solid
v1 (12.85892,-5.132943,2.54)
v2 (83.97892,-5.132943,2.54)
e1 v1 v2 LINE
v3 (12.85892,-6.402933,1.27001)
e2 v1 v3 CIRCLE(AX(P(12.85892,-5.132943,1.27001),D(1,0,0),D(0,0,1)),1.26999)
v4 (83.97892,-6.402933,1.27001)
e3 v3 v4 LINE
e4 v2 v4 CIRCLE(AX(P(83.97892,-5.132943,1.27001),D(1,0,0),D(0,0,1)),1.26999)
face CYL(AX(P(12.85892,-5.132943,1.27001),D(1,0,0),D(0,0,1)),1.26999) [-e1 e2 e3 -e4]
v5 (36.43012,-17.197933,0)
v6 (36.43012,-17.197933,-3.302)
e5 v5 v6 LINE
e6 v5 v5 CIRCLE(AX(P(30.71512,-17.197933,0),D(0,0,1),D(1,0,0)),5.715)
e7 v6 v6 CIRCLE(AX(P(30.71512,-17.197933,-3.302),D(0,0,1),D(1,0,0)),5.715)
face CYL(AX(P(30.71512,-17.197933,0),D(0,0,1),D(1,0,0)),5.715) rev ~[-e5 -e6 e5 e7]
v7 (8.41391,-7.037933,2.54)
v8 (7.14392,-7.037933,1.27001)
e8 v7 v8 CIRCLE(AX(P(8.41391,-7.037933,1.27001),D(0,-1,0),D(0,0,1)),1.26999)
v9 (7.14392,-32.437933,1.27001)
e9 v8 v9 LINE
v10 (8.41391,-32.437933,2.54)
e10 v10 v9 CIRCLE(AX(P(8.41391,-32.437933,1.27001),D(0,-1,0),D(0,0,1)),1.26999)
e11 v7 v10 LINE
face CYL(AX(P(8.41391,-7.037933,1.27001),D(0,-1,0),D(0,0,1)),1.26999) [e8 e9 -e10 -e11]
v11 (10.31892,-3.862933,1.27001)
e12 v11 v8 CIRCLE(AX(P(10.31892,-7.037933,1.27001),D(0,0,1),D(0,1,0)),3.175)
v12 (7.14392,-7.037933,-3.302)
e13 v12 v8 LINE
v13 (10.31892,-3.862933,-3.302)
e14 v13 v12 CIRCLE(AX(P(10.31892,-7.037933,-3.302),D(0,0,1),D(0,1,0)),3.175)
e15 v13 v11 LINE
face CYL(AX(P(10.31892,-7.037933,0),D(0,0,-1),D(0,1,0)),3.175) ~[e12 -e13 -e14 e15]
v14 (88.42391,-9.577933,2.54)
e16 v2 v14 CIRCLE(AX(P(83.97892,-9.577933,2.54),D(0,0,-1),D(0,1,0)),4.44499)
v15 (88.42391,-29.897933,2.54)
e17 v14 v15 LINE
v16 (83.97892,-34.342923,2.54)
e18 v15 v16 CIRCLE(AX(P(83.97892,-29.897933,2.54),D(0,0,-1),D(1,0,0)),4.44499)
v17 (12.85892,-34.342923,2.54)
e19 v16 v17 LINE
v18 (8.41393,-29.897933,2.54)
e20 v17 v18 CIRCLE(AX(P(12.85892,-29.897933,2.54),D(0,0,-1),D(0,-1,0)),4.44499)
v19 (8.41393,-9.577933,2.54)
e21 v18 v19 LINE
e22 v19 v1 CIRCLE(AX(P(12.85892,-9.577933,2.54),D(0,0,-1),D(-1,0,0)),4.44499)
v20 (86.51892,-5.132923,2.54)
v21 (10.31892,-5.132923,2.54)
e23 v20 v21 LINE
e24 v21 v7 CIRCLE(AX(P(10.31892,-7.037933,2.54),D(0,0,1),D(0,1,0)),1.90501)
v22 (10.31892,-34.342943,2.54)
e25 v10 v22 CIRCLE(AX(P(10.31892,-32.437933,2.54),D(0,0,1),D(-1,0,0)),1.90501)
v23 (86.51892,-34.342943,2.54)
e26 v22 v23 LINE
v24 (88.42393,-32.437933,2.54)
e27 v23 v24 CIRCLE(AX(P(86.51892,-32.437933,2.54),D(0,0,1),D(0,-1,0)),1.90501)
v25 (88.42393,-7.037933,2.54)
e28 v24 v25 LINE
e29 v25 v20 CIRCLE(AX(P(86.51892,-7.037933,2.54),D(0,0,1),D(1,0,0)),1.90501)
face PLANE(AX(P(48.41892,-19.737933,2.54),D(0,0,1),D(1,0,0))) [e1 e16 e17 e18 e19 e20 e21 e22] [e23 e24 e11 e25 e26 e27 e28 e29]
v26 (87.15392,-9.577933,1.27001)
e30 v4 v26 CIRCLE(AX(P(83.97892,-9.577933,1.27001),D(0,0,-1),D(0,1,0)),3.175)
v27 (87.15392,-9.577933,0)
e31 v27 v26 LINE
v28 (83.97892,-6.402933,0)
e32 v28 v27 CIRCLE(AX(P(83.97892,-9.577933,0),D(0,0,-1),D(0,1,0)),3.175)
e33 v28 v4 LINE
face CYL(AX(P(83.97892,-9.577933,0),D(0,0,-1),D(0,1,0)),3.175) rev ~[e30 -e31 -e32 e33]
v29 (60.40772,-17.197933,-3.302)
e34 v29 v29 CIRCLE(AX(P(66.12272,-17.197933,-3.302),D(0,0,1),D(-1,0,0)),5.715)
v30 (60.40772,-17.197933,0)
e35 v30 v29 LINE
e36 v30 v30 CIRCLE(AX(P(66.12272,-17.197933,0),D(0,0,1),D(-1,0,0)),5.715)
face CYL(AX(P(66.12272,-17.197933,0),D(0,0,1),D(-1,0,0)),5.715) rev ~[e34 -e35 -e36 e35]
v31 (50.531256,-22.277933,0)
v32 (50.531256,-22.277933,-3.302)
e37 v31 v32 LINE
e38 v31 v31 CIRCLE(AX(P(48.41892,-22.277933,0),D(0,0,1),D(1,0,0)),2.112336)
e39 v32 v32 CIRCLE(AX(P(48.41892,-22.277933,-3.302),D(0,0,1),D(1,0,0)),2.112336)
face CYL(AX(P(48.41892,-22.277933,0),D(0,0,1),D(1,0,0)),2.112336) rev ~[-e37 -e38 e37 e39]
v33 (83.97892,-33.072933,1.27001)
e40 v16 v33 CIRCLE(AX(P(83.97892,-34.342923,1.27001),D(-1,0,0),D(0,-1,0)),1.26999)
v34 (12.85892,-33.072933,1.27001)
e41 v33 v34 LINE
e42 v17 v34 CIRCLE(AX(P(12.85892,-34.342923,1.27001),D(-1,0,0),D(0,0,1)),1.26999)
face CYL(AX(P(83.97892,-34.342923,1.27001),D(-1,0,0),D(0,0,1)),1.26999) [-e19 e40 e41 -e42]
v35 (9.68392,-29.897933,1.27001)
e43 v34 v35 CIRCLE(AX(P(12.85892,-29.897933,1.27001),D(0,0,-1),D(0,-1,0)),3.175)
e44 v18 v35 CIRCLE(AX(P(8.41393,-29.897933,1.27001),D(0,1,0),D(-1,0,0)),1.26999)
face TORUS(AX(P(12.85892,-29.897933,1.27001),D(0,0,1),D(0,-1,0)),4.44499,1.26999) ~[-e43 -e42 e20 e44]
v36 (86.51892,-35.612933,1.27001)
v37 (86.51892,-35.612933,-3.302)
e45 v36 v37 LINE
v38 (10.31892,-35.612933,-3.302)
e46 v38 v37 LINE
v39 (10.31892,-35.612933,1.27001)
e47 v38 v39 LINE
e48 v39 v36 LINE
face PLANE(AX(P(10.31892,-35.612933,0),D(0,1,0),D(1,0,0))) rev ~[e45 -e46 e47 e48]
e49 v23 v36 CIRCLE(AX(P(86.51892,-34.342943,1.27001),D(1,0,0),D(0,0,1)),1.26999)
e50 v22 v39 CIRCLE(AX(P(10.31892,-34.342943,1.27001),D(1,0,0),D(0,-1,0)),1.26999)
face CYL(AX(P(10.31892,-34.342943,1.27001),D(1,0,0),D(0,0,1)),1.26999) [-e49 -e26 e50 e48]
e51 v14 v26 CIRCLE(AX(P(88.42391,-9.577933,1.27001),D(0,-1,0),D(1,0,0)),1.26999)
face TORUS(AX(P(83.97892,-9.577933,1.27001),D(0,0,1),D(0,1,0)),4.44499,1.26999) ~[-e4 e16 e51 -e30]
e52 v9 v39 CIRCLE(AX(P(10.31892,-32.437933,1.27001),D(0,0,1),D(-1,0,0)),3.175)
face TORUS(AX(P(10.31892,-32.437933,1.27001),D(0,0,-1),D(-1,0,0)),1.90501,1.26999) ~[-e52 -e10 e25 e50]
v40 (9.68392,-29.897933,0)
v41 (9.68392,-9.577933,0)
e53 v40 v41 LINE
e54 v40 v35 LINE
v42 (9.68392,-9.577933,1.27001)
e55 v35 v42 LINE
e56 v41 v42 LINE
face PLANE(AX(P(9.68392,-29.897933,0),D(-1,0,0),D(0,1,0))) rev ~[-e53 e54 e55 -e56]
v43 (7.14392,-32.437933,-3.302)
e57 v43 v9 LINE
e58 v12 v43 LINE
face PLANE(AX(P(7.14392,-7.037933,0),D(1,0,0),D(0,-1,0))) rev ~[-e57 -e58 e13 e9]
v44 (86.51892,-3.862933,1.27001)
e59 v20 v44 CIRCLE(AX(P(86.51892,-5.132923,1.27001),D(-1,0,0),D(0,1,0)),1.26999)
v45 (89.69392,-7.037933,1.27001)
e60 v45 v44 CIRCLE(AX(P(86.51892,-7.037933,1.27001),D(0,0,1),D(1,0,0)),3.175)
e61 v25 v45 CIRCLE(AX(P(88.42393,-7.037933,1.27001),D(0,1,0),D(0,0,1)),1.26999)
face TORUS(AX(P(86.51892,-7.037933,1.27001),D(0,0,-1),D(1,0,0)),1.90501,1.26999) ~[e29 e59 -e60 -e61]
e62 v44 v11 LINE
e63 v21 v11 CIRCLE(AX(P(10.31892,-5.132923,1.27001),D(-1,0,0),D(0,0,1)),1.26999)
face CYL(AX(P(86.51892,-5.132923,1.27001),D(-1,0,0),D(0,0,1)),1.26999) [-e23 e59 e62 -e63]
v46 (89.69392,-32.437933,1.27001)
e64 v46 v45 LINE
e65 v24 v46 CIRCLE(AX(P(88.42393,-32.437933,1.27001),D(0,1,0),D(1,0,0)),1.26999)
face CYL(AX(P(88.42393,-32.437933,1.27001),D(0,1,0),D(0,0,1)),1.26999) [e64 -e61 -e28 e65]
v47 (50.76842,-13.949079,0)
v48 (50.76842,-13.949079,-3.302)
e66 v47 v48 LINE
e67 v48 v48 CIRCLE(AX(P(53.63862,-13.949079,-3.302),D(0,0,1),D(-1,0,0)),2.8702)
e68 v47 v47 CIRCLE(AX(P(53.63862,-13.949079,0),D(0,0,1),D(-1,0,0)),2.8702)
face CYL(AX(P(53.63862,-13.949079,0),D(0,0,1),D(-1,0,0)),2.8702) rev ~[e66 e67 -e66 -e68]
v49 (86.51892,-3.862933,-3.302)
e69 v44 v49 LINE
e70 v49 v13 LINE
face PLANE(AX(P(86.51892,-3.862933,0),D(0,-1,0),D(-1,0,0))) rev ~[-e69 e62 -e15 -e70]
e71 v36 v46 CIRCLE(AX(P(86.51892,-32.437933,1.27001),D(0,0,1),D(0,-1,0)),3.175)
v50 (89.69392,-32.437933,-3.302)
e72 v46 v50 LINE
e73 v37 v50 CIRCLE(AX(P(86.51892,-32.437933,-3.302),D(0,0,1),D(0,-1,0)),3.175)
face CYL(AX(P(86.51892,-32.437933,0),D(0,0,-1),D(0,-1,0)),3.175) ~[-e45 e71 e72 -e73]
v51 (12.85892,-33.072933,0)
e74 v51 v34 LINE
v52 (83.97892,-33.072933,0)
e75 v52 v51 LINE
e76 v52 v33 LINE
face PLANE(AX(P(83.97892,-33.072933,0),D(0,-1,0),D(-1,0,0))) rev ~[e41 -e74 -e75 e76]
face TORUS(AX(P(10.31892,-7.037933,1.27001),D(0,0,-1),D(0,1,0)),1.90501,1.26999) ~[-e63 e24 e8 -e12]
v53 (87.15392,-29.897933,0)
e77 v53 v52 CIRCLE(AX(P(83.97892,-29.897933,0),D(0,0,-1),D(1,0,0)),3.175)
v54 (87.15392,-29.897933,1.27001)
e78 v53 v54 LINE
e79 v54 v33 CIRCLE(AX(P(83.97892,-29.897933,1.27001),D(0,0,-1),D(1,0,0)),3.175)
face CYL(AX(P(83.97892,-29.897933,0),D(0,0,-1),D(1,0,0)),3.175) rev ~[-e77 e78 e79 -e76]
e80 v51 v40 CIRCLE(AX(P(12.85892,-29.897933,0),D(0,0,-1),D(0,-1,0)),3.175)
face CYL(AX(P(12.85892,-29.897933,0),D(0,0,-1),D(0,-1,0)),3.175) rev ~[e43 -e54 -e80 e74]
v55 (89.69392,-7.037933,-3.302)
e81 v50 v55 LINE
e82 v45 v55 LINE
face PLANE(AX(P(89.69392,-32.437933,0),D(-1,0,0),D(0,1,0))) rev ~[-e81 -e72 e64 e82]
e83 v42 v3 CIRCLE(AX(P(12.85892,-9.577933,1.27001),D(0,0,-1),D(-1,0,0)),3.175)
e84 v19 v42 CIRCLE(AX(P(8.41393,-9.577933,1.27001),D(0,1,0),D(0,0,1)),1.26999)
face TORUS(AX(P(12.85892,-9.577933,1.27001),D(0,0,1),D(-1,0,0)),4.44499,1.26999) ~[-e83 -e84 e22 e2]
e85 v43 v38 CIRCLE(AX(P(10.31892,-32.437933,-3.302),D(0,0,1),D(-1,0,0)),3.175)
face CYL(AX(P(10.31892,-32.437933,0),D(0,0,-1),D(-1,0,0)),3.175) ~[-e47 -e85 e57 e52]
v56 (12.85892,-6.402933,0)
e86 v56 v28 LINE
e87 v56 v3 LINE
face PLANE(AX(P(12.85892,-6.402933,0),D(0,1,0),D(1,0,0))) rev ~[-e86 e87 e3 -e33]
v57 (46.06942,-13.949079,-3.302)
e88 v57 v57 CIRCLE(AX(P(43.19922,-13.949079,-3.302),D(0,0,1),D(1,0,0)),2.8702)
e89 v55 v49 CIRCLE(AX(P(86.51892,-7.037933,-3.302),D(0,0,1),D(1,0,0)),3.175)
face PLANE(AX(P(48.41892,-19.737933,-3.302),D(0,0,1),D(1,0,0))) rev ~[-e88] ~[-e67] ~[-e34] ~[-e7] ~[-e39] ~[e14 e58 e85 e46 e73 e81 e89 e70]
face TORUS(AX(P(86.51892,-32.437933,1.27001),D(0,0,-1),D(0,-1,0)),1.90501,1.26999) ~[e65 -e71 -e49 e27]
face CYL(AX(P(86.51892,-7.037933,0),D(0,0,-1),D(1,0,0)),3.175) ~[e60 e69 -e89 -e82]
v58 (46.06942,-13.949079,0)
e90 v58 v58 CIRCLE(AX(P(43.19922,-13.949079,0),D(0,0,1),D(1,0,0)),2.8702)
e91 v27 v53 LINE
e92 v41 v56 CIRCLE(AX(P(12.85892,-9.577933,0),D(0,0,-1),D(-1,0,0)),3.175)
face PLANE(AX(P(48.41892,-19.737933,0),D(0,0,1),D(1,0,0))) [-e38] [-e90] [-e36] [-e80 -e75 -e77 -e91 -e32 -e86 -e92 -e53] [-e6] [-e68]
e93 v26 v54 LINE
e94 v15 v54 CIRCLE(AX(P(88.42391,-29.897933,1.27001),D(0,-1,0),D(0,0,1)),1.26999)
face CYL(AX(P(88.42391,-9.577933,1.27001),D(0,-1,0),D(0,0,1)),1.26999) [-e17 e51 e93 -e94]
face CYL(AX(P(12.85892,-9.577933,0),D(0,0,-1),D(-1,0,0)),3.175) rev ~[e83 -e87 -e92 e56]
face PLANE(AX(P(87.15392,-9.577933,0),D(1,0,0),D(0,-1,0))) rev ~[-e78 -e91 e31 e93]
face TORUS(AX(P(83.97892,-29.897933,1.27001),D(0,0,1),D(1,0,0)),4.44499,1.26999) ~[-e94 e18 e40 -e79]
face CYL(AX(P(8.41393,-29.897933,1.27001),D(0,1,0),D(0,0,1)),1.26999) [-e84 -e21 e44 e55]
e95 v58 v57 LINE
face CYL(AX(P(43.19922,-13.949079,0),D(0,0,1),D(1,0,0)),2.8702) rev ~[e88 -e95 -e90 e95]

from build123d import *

# Parameters (mm, degrees)
F1_DEPTH = 3.302
F2_DEPTH = 2.54
F3_R     = 5.715
F3_R_2   = 2.8702
F3_R_3   = 2.1123361497
F4_DEPTH = 3.303
F5_R     = 1.26999


# Not quite as in the source:
# - a fillet or chamfer is up to 0.001 mm smaller than in the source, because OpenCascade refuses the exact size


with BuildPart() as f1:
    # F0 (on Top) → F1 (new body)
    with BuildSketch(Plane.XY):
        with BuildLine():
            Line((86.5189202702, -3.8629329861), (10.3189202702, -3.8629329861))
            ThreePointArc((10.3189202702, -3.8629329861), (8.0738562399, -4.7928689558), (7.1439202702, -7.0379329861))
            Line((7.1439202702, -7.0379329861), (7.1439202702, -32.4379329861))
            ThreePointArc((7.1439202702, -32.4379329861), (8.0738562399, -34.6829970164), (10.3189202702, -35.6129329861))
            Line((10.3189202702, -35.6129329861), (86.5189202702, -35.6129329861))
            ThreePointArc((86.5189202702, -35.6129329861), (88.7639843005, -34.6829970164), (89.6939202702, -32.4379329861))
            Line((89.6939202702, -32.4379329861), (89.6939202702, -7.0379329861))
            ThreePointArc((89.6939202702, -7.0379329861), (88.7639843005, -4.7928689558), (86.5189202702, -3.8629329861))
        make_face()
        with BuildLine():
            Line((83.9789202702, -33.0729329861), (12.8589202702, -33.0729329861))
            ThreePointArc((12.8589202702, -33.0729329861), (10.6138562399, -32.1429970164), (9.6839202702, -29.8979329861))
            Line((9.6839202702, -29.8979329861), (9.6839202702, -9.5779329861))
            ThreePointArc((9.6839202702, -9.5779329861), (10.6138562399, -7.3328689558), (12.8589202702, -6.4029329861))
            Line((12.8589202702, -6.4029329861), (83.9789202702, -6.4029329861))
            ThreePointArc((83.9789202702, -6.4029329861), (86.2239843005, -7.3328689558), (87.1539202702, -9.5779329861))
            Line((87.1539202702, -9.5779329861), (87.1539202702, -29.8979329861))
            ThreePointArc((87.1539202702, -29.8979329861), (86.2239843005, -32.1429970164), (83.9789202702, -33.0729329861))
        make_face(mode=Mode.SUBTRACT)
        with BuildLine():
            ThreePointArc((9.6839202702, -29.8979329861), (10.6138562399, -32.1429970164), (12.8589202702, -33.0729329861))
            Line((12.8589202702, -33.0729329861), (83.9789202702, -33.0729329861))
            ThreePointArc((83.9789202702, -33.0729329861), (86.2239843005, -32.1429970164), (87.1539202702, -29.8979329861))
            Line((87.1539202702, -29.8979329861), (87.1539202702, -9.5779329861))
            ThreePointArc((87.1539202702, -9.5779329861), (86.2239843005, -7.3328689558), (83.9789202702, -6.4029329861))
            Line((83.9789202702, -6.4029329861), (12.8589202702, -6.4029329861))
            ThreePointArc((12.8589202702, -6.4029329861), (10.6138562399, -7.3328689558), (9.6839202702, -9.5779329861))
            Line((9.6839202702, -9.5779329861), (9.6839202702, -29.8979329861))
        make_face()
    extrude(amount=-F1_DEPTH)

    # F0 (on Top) → F2 (join)
    with BuildSketch(Plane.XY):
        with BuildLine():
            Line((86.5189202702, -3.8629329861), (10.3189202702, -3.8629329861))
            ThreePointArc((10.3189202702, -3.8629329861), (8.0738562399, -4.7928689558), (7.1439202702, -7.0379329861))
            Line((7.1439202702, -7.0379329861), (7.1439202702, -32.4379329861))
            ThreePointArc((7.1439202702, -32.4379329861), (8.0738562399, -34.6829970164), (10.3189202702, -35.6129329861))
            Line((10.3189202702, -35.6129329861), (86.5189202702, -35.6129329861))
            ThreePointArc((86.5189202702, -35.6129329861), (88.7639843005, -34.6829970164), (89.6939202702, -32.4379329861))
            Line((89.6939202702, -32.4379329861), (89.6939202702, -7.0379329861))
            ThreePointArc((89.6939202702, -7.0379329861), (88.7639843005, -4.7928689558), (86.5189202702, -3.8629329861))
        make_face()
        with BuildLine():
            Line((83.9789202702, -33.0729329861), (12.8589202702, -33.0729329861))
            ThreePointArc((12.8589202702, -33.0729329861), (10.6138562399, -32.1429970164), (9.6839202702, -29.8979329861))
            Line((9.6839202702, -29.8979329861), (9.6839202702, -9.5779329861))
            ThreePointArc((9.6839202702, -9.5779329861), (10.6138562399, -7.3328689558), (12.8589202702, -6.4029329861))
            Line((12.8589202702, -6.4029329861), (83.9789202702, -6.4029329861))
            ThreePointArc((83.9789202702, -6.4029329861), (86.2239843005, -7.3328689558), (87.1539202702, -9.5779329861))
            Line((87.1539202702, -9.5779329861), (87.1539202702, -29.8979329861))
            ThreePointArc((87.1539202702, -29.8979329861), (86.2239843005, -32.1429970164), (83.9789202702, -33.0729329861))
        make_face(mode=Mode.SUBTRACT)
    extrude(amount=F2_DEPTH)

    # F3 (on Top) → F4 (cut, through all)
    with BuildSketch(Plane.XY):
        with Locations((30.7151202702, -17.1979329861)):
            Circle(F3_R)
        with BuildLine():
            ThreePointArc((71.8377202702, -17.1979329861), (66.1227202702, -11.4829329861), (60.4077202702, -17.1979329861))
            ThreePointArc((60.4077202702, -17.1979329861), (66.1227202702, -22.9129329861), (71.8377202702, -17.1979329861))
        make_face()
        with Locations((43.1992202702, -13.949079439)):
            Circle(F3_R_2)
        with BuildLine():
            ThreePointArc((56.5088202702, -13.949079439), (53.6386202702, -11.078879439), (50.7684202702, -13.949079439))
            ThreePointArc((50.7684202702, -13.949079439), (53.6386202702, -16.819279439), (56.5088202702, -13.949079439))
        make_face()
        with Locations((48.4189202702, -22.2779329861)):
            Circle(F3_R_3)
    extrude(amount=-F4_DEPTH, mode=Mode.SUBTRACT)

    # F5 (radius 1.27 in the source; OpenCascade refuses exactly that, so slightly less here)
    f5_edges = [f1.edges().sort_by_distance(p)[0] for p in [
        (48.41892, -6.402933, 2.54),
        (10.613856, -7.332869, 2.54),
        (9.68392, -19.737933, 2.54),
        (10.613856, -32.142997, 2.54),
        (48.41892, -33.072933, 2.54),
        (87.15392, -19.737933, 2.54),
        (86.223984, -7.332869, 2.54),
        (86.223984, -32.142997, 2.54),
        (7.14392, -19.737933, 2.54),
        (8.073856, -4.792869, 2.54),
    ]]
    fillet(f5_edges, radius=F5_R)


solid = f1.part
